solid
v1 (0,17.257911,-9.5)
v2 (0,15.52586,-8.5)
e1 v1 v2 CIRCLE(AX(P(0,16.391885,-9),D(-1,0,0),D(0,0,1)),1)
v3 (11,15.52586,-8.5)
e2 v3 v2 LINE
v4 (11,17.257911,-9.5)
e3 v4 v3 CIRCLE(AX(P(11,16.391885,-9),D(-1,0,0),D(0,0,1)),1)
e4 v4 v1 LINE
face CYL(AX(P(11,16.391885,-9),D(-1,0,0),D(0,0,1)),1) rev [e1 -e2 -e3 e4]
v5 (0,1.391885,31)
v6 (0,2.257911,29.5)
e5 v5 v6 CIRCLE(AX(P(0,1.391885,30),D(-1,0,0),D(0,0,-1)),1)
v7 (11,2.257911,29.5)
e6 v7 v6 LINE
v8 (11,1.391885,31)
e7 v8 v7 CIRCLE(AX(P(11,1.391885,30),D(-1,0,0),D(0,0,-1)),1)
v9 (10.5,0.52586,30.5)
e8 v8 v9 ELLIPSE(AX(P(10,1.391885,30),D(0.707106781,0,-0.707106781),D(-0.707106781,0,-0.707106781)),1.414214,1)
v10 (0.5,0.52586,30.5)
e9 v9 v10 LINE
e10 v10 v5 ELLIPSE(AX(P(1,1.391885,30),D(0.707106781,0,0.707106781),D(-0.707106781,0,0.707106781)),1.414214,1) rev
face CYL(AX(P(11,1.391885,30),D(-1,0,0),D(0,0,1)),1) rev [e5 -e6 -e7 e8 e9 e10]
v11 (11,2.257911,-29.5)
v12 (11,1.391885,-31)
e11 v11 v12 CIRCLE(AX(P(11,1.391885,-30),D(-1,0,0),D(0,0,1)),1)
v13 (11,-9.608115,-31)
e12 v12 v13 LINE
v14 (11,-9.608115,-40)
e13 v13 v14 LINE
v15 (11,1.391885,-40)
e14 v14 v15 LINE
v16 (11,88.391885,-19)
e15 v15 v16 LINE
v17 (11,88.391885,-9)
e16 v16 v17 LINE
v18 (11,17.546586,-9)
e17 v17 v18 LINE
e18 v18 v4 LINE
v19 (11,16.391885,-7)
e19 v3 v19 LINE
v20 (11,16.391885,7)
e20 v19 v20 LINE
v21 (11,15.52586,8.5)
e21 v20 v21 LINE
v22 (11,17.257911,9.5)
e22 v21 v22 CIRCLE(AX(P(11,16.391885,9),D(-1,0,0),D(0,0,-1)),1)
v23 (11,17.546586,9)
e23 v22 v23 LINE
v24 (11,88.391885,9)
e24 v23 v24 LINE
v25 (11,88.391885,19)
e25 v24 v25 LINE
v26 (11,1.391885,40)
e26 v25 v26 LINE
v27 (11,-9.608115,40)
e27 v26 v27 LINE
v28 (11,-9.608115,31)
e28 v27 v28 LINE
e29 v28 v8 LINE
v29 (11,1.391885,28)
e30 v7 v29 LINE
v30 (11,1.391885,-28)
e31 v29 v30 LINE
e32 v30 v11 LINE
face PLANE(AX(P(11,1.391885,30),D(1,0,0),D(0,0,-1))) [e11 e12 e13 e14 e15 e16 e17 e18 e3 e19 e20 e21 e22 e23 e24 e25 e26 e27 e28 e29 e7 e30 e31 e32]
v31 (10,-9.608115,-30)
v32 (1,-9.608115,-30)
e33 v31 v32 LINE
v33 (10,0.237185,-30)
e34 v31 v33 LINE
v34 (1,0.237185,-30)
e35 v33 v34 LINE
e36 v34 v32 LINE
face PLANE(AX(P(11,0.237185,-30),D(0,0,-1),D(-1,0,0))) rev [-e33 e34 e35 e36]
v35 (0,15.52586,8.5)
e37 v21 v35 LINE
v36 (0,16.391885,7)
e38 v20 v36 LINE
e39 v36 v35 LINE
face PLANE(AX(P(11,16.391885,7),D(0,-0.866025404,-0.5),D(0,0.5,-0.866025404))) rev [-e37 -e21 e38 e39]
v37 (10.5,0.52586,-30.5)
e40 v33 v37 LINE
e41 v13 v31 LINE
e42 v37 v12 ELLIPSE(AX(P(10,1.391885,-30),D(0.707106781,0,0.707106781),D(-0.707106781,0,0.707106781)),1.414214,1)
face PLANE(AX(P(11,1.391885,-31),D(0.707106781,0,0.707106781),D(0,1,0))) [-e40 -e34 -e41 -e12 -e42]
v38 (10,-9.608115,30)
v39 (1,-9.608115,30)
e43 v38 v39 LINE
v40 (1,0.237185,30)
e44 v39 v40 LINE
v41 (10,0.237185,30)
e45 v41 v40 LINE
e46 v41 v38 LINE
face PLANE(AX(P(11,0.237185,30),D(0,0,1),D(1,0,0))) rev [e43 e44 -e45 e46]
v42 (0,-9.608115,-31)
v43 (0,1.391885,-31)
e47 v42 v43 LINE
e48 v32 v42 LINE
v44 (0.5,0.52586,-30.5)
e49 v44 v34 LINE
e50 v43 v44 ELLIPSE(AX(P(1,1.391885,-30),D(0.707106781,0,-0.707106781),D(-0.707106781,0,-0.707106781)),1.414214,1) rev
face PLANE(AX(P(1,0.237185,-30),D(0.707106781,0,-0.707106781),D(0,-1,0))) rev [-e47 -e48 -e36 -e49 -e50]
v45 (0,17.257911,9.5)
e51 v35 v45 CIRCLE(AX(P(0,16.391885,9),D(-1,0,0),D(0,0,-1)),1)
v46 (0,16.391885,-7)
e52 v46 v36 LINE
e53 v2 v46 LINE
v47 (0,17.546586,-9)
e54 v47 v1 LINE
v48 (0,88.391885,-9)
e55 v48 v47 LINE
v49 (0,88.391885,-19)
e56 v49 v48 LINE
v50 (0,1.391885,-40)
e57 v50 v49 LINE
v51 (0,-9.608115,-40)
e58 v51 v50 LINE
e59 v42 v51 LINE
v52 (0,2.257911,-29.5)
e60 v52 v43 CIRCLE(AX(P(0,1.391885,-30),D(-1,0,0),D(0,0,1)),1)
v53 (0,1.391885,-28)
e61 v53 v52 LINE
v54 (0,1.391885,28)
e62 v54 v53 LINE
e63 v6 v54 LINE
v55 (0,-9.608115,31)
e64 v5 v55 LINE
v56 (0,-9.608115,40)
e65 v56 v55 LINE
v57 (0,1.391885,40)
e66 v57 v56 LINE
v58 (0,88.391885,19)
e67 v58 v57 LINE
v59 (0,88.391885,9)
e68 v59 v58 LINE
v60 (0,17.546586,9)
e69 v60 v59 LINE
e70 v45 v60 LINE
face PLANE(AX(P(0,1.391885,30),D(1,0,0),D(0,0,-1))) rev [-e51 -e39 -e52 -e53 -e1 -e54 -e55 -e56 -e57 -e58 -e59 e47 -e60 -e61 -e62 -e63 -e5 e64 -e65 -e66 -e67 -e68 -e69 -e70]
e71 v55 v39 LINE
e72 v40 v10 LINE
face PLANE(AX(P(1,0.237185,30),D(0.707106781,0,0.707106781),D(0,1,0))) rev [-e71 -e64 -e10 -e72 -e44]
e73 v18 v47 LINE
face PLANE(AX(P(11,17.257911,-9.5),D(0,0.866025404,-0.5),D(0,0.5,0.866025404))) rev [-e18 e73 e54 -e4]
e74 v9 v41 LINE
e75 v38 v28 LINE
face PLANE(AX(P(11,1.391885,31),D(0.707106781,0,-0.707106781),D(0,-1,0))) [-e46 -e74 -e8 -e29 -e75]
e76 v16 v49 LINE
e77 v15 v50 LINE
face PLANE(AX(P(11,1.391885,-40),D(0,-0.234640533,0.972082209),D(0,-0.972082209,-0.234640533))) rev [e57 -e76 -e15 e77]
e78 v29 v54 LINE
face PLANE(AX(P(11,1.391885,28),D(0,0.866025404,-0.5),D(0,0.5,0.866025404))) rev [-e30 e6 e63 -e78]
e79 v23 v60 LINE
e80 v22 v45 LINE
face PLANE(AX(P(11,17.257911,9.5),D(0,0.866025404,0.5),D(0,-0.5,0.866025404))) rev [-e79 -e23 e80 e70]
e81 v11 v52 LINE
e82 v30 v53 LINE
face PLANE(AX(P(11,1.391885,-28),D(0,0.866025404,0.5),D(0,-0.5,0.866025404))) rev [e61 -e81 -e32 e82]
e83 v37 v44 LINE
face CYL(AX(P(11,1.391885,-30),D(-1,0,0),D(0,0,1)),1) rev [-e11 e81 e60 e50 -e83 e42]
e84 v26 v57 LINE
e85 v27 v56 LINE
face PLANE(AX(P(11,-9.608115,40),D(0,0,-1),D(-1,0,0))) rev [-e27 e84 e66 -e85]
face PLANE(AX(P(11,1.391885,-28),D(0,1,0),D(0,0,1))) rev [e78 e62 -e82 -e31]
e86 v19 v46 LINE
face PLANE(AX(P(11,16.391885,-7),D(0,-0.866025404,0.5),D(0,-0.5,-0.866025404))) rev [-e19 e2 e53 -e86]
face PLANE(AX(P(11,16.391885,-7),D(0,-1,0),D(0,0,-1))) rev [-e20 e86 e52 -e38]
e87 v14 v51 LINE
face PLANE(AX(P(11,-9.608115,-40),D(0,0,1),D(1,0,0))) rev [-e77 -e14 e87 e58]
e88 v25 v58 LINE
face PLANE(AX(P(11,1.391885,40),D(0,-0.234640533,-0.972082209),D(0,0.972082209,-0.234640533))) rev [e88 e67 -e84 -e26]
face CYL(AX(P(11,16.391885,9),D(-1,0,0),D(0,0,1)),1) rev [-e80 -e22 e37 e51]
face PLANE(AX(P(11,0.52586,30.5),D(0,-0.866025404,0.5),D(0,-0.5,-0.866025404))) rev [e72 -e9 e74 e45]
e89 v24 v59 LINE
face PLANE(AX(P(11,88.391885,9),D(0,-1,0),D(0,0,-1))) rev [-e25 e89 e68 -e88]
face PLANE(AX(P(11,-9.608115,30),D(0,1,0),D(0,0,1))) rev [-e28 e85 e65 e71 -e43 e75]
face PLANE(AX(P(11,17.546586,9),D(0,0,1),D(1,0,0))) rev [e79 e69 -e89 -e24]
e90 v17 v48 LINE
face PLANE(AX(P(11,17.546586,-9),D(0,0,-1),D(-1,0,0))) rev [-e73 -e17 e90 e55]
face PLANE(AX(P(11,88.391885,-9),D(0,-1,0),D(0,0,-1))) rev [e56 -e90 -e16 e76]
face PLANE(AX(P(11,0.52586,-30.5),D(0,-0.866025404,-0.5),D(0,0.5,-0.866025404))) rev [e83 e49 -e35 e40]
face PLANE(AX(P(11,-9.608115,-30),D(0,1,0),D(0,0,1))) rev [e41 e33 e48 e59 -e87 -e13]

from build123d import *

# Parameters (mm, degrees)
BOSS_EXTRUDE1_DEPTH = 11
CHAMFER4_SIZE       = 1
CHAMFER5_SIZE       = 1


with BuildPart() as part:
    # Sketch1 → Boss-Extrude1 (new body)
    with BuildSketch(Plane(origin=(0, 0, 0), x_dir=(0, 0, -1), z_dir=(1, 0, 0))):
        with BuildLine():
            Line((28, 1.391885412), (-28, 1.391885412))
            Line((-28, 1.391885412), (-29.5, 2.257910816))
            ThreePointArc((-29.5, 2.257910816), (-30.866025404, 1.891885412), (-30.5, 0.525860008))
            Line((-30.5, 0.525860008), (-30, 0.237184874))
            Line((-30, 0.237184874), (-30, -9.608114588))
            Line((-30, -9.608114588), (-40, -9.608114588))
            Line((-40, -9.608114588), (-40, 1.391885412))
            Line((-40, 1.391885412), (-19, 88.391885412))
            Line((-19, 88.391885412), (-9, 88.391885412))
            Line((-9, 88.391885412), (-9, 17.54658595))
            Line((-9, 17.54658595), (-9.5, 17.257910816))
            ThreePointArc((-9.5, 17.257910816), (-9.866025404, 15.891885412), (-8.5, 15.525860008))
            Line((-8.5, 15.525860008), (-7, 16.391885412))
            Line((-7, 16.391885412), (7, 16.391885412))
            Line((7, 16.391885412), (8.5, 15.525860008))
            ThreePointArc((8.5, 15.525860008), (9.866025404, 15.891885412), (9.5, 17.257910816))
            Line((9.5, 17.257910816), (9, 17.54658595))
            Line((9, 17.54658595), (9, 88.391885412))
            Line((9, 88.391885412), (19, 88.391885412))
            Line((19, 88.391885412), (40, 1.391885412))
            Line((40, 1.391885412), (40, -9.608114588))
            Line((40, -9.608114588), (30, -9.608114588))
            Line((30, -9.608114588), (30, 0.237184874))
            Line((30, 0.237184874), (30.5, 0.525860008))
            ThreePointArc((30.5, 0.525860008), (30.866025404, 1.891885412), (29.5, 2.257910816))
            Line((29.5, 2.257910816), (28, 1.391885412))
        make_face()
    extrude(amount=BOSS_EXTRUDE1_DEPTH)

    # Chamfer4
    chamfer4_edges = [part.edges().sort_by_distance(p)[0] for p in [
        (0, -4.685464857, 30),
        (11, -4.685464857, 30),
    ]]
    chamfer(chamfer4_edges, length=CHAMFER4_SIZE - 0.0001)  # a hair under: the kernel refuses the full size

    # Chamfer5
    chamfer5_edges = [part.edges().sort_by_distance(p)[0] for p in [
        (0, -4.685464857, -30),
        (11, -4.685464857, -30),
    ]]
    chamfer(chamfer5_edges, length=CHAMFER5_SIZE - 0.0001)  # a hair under: the kernel refuses the full size


solid = part.part
